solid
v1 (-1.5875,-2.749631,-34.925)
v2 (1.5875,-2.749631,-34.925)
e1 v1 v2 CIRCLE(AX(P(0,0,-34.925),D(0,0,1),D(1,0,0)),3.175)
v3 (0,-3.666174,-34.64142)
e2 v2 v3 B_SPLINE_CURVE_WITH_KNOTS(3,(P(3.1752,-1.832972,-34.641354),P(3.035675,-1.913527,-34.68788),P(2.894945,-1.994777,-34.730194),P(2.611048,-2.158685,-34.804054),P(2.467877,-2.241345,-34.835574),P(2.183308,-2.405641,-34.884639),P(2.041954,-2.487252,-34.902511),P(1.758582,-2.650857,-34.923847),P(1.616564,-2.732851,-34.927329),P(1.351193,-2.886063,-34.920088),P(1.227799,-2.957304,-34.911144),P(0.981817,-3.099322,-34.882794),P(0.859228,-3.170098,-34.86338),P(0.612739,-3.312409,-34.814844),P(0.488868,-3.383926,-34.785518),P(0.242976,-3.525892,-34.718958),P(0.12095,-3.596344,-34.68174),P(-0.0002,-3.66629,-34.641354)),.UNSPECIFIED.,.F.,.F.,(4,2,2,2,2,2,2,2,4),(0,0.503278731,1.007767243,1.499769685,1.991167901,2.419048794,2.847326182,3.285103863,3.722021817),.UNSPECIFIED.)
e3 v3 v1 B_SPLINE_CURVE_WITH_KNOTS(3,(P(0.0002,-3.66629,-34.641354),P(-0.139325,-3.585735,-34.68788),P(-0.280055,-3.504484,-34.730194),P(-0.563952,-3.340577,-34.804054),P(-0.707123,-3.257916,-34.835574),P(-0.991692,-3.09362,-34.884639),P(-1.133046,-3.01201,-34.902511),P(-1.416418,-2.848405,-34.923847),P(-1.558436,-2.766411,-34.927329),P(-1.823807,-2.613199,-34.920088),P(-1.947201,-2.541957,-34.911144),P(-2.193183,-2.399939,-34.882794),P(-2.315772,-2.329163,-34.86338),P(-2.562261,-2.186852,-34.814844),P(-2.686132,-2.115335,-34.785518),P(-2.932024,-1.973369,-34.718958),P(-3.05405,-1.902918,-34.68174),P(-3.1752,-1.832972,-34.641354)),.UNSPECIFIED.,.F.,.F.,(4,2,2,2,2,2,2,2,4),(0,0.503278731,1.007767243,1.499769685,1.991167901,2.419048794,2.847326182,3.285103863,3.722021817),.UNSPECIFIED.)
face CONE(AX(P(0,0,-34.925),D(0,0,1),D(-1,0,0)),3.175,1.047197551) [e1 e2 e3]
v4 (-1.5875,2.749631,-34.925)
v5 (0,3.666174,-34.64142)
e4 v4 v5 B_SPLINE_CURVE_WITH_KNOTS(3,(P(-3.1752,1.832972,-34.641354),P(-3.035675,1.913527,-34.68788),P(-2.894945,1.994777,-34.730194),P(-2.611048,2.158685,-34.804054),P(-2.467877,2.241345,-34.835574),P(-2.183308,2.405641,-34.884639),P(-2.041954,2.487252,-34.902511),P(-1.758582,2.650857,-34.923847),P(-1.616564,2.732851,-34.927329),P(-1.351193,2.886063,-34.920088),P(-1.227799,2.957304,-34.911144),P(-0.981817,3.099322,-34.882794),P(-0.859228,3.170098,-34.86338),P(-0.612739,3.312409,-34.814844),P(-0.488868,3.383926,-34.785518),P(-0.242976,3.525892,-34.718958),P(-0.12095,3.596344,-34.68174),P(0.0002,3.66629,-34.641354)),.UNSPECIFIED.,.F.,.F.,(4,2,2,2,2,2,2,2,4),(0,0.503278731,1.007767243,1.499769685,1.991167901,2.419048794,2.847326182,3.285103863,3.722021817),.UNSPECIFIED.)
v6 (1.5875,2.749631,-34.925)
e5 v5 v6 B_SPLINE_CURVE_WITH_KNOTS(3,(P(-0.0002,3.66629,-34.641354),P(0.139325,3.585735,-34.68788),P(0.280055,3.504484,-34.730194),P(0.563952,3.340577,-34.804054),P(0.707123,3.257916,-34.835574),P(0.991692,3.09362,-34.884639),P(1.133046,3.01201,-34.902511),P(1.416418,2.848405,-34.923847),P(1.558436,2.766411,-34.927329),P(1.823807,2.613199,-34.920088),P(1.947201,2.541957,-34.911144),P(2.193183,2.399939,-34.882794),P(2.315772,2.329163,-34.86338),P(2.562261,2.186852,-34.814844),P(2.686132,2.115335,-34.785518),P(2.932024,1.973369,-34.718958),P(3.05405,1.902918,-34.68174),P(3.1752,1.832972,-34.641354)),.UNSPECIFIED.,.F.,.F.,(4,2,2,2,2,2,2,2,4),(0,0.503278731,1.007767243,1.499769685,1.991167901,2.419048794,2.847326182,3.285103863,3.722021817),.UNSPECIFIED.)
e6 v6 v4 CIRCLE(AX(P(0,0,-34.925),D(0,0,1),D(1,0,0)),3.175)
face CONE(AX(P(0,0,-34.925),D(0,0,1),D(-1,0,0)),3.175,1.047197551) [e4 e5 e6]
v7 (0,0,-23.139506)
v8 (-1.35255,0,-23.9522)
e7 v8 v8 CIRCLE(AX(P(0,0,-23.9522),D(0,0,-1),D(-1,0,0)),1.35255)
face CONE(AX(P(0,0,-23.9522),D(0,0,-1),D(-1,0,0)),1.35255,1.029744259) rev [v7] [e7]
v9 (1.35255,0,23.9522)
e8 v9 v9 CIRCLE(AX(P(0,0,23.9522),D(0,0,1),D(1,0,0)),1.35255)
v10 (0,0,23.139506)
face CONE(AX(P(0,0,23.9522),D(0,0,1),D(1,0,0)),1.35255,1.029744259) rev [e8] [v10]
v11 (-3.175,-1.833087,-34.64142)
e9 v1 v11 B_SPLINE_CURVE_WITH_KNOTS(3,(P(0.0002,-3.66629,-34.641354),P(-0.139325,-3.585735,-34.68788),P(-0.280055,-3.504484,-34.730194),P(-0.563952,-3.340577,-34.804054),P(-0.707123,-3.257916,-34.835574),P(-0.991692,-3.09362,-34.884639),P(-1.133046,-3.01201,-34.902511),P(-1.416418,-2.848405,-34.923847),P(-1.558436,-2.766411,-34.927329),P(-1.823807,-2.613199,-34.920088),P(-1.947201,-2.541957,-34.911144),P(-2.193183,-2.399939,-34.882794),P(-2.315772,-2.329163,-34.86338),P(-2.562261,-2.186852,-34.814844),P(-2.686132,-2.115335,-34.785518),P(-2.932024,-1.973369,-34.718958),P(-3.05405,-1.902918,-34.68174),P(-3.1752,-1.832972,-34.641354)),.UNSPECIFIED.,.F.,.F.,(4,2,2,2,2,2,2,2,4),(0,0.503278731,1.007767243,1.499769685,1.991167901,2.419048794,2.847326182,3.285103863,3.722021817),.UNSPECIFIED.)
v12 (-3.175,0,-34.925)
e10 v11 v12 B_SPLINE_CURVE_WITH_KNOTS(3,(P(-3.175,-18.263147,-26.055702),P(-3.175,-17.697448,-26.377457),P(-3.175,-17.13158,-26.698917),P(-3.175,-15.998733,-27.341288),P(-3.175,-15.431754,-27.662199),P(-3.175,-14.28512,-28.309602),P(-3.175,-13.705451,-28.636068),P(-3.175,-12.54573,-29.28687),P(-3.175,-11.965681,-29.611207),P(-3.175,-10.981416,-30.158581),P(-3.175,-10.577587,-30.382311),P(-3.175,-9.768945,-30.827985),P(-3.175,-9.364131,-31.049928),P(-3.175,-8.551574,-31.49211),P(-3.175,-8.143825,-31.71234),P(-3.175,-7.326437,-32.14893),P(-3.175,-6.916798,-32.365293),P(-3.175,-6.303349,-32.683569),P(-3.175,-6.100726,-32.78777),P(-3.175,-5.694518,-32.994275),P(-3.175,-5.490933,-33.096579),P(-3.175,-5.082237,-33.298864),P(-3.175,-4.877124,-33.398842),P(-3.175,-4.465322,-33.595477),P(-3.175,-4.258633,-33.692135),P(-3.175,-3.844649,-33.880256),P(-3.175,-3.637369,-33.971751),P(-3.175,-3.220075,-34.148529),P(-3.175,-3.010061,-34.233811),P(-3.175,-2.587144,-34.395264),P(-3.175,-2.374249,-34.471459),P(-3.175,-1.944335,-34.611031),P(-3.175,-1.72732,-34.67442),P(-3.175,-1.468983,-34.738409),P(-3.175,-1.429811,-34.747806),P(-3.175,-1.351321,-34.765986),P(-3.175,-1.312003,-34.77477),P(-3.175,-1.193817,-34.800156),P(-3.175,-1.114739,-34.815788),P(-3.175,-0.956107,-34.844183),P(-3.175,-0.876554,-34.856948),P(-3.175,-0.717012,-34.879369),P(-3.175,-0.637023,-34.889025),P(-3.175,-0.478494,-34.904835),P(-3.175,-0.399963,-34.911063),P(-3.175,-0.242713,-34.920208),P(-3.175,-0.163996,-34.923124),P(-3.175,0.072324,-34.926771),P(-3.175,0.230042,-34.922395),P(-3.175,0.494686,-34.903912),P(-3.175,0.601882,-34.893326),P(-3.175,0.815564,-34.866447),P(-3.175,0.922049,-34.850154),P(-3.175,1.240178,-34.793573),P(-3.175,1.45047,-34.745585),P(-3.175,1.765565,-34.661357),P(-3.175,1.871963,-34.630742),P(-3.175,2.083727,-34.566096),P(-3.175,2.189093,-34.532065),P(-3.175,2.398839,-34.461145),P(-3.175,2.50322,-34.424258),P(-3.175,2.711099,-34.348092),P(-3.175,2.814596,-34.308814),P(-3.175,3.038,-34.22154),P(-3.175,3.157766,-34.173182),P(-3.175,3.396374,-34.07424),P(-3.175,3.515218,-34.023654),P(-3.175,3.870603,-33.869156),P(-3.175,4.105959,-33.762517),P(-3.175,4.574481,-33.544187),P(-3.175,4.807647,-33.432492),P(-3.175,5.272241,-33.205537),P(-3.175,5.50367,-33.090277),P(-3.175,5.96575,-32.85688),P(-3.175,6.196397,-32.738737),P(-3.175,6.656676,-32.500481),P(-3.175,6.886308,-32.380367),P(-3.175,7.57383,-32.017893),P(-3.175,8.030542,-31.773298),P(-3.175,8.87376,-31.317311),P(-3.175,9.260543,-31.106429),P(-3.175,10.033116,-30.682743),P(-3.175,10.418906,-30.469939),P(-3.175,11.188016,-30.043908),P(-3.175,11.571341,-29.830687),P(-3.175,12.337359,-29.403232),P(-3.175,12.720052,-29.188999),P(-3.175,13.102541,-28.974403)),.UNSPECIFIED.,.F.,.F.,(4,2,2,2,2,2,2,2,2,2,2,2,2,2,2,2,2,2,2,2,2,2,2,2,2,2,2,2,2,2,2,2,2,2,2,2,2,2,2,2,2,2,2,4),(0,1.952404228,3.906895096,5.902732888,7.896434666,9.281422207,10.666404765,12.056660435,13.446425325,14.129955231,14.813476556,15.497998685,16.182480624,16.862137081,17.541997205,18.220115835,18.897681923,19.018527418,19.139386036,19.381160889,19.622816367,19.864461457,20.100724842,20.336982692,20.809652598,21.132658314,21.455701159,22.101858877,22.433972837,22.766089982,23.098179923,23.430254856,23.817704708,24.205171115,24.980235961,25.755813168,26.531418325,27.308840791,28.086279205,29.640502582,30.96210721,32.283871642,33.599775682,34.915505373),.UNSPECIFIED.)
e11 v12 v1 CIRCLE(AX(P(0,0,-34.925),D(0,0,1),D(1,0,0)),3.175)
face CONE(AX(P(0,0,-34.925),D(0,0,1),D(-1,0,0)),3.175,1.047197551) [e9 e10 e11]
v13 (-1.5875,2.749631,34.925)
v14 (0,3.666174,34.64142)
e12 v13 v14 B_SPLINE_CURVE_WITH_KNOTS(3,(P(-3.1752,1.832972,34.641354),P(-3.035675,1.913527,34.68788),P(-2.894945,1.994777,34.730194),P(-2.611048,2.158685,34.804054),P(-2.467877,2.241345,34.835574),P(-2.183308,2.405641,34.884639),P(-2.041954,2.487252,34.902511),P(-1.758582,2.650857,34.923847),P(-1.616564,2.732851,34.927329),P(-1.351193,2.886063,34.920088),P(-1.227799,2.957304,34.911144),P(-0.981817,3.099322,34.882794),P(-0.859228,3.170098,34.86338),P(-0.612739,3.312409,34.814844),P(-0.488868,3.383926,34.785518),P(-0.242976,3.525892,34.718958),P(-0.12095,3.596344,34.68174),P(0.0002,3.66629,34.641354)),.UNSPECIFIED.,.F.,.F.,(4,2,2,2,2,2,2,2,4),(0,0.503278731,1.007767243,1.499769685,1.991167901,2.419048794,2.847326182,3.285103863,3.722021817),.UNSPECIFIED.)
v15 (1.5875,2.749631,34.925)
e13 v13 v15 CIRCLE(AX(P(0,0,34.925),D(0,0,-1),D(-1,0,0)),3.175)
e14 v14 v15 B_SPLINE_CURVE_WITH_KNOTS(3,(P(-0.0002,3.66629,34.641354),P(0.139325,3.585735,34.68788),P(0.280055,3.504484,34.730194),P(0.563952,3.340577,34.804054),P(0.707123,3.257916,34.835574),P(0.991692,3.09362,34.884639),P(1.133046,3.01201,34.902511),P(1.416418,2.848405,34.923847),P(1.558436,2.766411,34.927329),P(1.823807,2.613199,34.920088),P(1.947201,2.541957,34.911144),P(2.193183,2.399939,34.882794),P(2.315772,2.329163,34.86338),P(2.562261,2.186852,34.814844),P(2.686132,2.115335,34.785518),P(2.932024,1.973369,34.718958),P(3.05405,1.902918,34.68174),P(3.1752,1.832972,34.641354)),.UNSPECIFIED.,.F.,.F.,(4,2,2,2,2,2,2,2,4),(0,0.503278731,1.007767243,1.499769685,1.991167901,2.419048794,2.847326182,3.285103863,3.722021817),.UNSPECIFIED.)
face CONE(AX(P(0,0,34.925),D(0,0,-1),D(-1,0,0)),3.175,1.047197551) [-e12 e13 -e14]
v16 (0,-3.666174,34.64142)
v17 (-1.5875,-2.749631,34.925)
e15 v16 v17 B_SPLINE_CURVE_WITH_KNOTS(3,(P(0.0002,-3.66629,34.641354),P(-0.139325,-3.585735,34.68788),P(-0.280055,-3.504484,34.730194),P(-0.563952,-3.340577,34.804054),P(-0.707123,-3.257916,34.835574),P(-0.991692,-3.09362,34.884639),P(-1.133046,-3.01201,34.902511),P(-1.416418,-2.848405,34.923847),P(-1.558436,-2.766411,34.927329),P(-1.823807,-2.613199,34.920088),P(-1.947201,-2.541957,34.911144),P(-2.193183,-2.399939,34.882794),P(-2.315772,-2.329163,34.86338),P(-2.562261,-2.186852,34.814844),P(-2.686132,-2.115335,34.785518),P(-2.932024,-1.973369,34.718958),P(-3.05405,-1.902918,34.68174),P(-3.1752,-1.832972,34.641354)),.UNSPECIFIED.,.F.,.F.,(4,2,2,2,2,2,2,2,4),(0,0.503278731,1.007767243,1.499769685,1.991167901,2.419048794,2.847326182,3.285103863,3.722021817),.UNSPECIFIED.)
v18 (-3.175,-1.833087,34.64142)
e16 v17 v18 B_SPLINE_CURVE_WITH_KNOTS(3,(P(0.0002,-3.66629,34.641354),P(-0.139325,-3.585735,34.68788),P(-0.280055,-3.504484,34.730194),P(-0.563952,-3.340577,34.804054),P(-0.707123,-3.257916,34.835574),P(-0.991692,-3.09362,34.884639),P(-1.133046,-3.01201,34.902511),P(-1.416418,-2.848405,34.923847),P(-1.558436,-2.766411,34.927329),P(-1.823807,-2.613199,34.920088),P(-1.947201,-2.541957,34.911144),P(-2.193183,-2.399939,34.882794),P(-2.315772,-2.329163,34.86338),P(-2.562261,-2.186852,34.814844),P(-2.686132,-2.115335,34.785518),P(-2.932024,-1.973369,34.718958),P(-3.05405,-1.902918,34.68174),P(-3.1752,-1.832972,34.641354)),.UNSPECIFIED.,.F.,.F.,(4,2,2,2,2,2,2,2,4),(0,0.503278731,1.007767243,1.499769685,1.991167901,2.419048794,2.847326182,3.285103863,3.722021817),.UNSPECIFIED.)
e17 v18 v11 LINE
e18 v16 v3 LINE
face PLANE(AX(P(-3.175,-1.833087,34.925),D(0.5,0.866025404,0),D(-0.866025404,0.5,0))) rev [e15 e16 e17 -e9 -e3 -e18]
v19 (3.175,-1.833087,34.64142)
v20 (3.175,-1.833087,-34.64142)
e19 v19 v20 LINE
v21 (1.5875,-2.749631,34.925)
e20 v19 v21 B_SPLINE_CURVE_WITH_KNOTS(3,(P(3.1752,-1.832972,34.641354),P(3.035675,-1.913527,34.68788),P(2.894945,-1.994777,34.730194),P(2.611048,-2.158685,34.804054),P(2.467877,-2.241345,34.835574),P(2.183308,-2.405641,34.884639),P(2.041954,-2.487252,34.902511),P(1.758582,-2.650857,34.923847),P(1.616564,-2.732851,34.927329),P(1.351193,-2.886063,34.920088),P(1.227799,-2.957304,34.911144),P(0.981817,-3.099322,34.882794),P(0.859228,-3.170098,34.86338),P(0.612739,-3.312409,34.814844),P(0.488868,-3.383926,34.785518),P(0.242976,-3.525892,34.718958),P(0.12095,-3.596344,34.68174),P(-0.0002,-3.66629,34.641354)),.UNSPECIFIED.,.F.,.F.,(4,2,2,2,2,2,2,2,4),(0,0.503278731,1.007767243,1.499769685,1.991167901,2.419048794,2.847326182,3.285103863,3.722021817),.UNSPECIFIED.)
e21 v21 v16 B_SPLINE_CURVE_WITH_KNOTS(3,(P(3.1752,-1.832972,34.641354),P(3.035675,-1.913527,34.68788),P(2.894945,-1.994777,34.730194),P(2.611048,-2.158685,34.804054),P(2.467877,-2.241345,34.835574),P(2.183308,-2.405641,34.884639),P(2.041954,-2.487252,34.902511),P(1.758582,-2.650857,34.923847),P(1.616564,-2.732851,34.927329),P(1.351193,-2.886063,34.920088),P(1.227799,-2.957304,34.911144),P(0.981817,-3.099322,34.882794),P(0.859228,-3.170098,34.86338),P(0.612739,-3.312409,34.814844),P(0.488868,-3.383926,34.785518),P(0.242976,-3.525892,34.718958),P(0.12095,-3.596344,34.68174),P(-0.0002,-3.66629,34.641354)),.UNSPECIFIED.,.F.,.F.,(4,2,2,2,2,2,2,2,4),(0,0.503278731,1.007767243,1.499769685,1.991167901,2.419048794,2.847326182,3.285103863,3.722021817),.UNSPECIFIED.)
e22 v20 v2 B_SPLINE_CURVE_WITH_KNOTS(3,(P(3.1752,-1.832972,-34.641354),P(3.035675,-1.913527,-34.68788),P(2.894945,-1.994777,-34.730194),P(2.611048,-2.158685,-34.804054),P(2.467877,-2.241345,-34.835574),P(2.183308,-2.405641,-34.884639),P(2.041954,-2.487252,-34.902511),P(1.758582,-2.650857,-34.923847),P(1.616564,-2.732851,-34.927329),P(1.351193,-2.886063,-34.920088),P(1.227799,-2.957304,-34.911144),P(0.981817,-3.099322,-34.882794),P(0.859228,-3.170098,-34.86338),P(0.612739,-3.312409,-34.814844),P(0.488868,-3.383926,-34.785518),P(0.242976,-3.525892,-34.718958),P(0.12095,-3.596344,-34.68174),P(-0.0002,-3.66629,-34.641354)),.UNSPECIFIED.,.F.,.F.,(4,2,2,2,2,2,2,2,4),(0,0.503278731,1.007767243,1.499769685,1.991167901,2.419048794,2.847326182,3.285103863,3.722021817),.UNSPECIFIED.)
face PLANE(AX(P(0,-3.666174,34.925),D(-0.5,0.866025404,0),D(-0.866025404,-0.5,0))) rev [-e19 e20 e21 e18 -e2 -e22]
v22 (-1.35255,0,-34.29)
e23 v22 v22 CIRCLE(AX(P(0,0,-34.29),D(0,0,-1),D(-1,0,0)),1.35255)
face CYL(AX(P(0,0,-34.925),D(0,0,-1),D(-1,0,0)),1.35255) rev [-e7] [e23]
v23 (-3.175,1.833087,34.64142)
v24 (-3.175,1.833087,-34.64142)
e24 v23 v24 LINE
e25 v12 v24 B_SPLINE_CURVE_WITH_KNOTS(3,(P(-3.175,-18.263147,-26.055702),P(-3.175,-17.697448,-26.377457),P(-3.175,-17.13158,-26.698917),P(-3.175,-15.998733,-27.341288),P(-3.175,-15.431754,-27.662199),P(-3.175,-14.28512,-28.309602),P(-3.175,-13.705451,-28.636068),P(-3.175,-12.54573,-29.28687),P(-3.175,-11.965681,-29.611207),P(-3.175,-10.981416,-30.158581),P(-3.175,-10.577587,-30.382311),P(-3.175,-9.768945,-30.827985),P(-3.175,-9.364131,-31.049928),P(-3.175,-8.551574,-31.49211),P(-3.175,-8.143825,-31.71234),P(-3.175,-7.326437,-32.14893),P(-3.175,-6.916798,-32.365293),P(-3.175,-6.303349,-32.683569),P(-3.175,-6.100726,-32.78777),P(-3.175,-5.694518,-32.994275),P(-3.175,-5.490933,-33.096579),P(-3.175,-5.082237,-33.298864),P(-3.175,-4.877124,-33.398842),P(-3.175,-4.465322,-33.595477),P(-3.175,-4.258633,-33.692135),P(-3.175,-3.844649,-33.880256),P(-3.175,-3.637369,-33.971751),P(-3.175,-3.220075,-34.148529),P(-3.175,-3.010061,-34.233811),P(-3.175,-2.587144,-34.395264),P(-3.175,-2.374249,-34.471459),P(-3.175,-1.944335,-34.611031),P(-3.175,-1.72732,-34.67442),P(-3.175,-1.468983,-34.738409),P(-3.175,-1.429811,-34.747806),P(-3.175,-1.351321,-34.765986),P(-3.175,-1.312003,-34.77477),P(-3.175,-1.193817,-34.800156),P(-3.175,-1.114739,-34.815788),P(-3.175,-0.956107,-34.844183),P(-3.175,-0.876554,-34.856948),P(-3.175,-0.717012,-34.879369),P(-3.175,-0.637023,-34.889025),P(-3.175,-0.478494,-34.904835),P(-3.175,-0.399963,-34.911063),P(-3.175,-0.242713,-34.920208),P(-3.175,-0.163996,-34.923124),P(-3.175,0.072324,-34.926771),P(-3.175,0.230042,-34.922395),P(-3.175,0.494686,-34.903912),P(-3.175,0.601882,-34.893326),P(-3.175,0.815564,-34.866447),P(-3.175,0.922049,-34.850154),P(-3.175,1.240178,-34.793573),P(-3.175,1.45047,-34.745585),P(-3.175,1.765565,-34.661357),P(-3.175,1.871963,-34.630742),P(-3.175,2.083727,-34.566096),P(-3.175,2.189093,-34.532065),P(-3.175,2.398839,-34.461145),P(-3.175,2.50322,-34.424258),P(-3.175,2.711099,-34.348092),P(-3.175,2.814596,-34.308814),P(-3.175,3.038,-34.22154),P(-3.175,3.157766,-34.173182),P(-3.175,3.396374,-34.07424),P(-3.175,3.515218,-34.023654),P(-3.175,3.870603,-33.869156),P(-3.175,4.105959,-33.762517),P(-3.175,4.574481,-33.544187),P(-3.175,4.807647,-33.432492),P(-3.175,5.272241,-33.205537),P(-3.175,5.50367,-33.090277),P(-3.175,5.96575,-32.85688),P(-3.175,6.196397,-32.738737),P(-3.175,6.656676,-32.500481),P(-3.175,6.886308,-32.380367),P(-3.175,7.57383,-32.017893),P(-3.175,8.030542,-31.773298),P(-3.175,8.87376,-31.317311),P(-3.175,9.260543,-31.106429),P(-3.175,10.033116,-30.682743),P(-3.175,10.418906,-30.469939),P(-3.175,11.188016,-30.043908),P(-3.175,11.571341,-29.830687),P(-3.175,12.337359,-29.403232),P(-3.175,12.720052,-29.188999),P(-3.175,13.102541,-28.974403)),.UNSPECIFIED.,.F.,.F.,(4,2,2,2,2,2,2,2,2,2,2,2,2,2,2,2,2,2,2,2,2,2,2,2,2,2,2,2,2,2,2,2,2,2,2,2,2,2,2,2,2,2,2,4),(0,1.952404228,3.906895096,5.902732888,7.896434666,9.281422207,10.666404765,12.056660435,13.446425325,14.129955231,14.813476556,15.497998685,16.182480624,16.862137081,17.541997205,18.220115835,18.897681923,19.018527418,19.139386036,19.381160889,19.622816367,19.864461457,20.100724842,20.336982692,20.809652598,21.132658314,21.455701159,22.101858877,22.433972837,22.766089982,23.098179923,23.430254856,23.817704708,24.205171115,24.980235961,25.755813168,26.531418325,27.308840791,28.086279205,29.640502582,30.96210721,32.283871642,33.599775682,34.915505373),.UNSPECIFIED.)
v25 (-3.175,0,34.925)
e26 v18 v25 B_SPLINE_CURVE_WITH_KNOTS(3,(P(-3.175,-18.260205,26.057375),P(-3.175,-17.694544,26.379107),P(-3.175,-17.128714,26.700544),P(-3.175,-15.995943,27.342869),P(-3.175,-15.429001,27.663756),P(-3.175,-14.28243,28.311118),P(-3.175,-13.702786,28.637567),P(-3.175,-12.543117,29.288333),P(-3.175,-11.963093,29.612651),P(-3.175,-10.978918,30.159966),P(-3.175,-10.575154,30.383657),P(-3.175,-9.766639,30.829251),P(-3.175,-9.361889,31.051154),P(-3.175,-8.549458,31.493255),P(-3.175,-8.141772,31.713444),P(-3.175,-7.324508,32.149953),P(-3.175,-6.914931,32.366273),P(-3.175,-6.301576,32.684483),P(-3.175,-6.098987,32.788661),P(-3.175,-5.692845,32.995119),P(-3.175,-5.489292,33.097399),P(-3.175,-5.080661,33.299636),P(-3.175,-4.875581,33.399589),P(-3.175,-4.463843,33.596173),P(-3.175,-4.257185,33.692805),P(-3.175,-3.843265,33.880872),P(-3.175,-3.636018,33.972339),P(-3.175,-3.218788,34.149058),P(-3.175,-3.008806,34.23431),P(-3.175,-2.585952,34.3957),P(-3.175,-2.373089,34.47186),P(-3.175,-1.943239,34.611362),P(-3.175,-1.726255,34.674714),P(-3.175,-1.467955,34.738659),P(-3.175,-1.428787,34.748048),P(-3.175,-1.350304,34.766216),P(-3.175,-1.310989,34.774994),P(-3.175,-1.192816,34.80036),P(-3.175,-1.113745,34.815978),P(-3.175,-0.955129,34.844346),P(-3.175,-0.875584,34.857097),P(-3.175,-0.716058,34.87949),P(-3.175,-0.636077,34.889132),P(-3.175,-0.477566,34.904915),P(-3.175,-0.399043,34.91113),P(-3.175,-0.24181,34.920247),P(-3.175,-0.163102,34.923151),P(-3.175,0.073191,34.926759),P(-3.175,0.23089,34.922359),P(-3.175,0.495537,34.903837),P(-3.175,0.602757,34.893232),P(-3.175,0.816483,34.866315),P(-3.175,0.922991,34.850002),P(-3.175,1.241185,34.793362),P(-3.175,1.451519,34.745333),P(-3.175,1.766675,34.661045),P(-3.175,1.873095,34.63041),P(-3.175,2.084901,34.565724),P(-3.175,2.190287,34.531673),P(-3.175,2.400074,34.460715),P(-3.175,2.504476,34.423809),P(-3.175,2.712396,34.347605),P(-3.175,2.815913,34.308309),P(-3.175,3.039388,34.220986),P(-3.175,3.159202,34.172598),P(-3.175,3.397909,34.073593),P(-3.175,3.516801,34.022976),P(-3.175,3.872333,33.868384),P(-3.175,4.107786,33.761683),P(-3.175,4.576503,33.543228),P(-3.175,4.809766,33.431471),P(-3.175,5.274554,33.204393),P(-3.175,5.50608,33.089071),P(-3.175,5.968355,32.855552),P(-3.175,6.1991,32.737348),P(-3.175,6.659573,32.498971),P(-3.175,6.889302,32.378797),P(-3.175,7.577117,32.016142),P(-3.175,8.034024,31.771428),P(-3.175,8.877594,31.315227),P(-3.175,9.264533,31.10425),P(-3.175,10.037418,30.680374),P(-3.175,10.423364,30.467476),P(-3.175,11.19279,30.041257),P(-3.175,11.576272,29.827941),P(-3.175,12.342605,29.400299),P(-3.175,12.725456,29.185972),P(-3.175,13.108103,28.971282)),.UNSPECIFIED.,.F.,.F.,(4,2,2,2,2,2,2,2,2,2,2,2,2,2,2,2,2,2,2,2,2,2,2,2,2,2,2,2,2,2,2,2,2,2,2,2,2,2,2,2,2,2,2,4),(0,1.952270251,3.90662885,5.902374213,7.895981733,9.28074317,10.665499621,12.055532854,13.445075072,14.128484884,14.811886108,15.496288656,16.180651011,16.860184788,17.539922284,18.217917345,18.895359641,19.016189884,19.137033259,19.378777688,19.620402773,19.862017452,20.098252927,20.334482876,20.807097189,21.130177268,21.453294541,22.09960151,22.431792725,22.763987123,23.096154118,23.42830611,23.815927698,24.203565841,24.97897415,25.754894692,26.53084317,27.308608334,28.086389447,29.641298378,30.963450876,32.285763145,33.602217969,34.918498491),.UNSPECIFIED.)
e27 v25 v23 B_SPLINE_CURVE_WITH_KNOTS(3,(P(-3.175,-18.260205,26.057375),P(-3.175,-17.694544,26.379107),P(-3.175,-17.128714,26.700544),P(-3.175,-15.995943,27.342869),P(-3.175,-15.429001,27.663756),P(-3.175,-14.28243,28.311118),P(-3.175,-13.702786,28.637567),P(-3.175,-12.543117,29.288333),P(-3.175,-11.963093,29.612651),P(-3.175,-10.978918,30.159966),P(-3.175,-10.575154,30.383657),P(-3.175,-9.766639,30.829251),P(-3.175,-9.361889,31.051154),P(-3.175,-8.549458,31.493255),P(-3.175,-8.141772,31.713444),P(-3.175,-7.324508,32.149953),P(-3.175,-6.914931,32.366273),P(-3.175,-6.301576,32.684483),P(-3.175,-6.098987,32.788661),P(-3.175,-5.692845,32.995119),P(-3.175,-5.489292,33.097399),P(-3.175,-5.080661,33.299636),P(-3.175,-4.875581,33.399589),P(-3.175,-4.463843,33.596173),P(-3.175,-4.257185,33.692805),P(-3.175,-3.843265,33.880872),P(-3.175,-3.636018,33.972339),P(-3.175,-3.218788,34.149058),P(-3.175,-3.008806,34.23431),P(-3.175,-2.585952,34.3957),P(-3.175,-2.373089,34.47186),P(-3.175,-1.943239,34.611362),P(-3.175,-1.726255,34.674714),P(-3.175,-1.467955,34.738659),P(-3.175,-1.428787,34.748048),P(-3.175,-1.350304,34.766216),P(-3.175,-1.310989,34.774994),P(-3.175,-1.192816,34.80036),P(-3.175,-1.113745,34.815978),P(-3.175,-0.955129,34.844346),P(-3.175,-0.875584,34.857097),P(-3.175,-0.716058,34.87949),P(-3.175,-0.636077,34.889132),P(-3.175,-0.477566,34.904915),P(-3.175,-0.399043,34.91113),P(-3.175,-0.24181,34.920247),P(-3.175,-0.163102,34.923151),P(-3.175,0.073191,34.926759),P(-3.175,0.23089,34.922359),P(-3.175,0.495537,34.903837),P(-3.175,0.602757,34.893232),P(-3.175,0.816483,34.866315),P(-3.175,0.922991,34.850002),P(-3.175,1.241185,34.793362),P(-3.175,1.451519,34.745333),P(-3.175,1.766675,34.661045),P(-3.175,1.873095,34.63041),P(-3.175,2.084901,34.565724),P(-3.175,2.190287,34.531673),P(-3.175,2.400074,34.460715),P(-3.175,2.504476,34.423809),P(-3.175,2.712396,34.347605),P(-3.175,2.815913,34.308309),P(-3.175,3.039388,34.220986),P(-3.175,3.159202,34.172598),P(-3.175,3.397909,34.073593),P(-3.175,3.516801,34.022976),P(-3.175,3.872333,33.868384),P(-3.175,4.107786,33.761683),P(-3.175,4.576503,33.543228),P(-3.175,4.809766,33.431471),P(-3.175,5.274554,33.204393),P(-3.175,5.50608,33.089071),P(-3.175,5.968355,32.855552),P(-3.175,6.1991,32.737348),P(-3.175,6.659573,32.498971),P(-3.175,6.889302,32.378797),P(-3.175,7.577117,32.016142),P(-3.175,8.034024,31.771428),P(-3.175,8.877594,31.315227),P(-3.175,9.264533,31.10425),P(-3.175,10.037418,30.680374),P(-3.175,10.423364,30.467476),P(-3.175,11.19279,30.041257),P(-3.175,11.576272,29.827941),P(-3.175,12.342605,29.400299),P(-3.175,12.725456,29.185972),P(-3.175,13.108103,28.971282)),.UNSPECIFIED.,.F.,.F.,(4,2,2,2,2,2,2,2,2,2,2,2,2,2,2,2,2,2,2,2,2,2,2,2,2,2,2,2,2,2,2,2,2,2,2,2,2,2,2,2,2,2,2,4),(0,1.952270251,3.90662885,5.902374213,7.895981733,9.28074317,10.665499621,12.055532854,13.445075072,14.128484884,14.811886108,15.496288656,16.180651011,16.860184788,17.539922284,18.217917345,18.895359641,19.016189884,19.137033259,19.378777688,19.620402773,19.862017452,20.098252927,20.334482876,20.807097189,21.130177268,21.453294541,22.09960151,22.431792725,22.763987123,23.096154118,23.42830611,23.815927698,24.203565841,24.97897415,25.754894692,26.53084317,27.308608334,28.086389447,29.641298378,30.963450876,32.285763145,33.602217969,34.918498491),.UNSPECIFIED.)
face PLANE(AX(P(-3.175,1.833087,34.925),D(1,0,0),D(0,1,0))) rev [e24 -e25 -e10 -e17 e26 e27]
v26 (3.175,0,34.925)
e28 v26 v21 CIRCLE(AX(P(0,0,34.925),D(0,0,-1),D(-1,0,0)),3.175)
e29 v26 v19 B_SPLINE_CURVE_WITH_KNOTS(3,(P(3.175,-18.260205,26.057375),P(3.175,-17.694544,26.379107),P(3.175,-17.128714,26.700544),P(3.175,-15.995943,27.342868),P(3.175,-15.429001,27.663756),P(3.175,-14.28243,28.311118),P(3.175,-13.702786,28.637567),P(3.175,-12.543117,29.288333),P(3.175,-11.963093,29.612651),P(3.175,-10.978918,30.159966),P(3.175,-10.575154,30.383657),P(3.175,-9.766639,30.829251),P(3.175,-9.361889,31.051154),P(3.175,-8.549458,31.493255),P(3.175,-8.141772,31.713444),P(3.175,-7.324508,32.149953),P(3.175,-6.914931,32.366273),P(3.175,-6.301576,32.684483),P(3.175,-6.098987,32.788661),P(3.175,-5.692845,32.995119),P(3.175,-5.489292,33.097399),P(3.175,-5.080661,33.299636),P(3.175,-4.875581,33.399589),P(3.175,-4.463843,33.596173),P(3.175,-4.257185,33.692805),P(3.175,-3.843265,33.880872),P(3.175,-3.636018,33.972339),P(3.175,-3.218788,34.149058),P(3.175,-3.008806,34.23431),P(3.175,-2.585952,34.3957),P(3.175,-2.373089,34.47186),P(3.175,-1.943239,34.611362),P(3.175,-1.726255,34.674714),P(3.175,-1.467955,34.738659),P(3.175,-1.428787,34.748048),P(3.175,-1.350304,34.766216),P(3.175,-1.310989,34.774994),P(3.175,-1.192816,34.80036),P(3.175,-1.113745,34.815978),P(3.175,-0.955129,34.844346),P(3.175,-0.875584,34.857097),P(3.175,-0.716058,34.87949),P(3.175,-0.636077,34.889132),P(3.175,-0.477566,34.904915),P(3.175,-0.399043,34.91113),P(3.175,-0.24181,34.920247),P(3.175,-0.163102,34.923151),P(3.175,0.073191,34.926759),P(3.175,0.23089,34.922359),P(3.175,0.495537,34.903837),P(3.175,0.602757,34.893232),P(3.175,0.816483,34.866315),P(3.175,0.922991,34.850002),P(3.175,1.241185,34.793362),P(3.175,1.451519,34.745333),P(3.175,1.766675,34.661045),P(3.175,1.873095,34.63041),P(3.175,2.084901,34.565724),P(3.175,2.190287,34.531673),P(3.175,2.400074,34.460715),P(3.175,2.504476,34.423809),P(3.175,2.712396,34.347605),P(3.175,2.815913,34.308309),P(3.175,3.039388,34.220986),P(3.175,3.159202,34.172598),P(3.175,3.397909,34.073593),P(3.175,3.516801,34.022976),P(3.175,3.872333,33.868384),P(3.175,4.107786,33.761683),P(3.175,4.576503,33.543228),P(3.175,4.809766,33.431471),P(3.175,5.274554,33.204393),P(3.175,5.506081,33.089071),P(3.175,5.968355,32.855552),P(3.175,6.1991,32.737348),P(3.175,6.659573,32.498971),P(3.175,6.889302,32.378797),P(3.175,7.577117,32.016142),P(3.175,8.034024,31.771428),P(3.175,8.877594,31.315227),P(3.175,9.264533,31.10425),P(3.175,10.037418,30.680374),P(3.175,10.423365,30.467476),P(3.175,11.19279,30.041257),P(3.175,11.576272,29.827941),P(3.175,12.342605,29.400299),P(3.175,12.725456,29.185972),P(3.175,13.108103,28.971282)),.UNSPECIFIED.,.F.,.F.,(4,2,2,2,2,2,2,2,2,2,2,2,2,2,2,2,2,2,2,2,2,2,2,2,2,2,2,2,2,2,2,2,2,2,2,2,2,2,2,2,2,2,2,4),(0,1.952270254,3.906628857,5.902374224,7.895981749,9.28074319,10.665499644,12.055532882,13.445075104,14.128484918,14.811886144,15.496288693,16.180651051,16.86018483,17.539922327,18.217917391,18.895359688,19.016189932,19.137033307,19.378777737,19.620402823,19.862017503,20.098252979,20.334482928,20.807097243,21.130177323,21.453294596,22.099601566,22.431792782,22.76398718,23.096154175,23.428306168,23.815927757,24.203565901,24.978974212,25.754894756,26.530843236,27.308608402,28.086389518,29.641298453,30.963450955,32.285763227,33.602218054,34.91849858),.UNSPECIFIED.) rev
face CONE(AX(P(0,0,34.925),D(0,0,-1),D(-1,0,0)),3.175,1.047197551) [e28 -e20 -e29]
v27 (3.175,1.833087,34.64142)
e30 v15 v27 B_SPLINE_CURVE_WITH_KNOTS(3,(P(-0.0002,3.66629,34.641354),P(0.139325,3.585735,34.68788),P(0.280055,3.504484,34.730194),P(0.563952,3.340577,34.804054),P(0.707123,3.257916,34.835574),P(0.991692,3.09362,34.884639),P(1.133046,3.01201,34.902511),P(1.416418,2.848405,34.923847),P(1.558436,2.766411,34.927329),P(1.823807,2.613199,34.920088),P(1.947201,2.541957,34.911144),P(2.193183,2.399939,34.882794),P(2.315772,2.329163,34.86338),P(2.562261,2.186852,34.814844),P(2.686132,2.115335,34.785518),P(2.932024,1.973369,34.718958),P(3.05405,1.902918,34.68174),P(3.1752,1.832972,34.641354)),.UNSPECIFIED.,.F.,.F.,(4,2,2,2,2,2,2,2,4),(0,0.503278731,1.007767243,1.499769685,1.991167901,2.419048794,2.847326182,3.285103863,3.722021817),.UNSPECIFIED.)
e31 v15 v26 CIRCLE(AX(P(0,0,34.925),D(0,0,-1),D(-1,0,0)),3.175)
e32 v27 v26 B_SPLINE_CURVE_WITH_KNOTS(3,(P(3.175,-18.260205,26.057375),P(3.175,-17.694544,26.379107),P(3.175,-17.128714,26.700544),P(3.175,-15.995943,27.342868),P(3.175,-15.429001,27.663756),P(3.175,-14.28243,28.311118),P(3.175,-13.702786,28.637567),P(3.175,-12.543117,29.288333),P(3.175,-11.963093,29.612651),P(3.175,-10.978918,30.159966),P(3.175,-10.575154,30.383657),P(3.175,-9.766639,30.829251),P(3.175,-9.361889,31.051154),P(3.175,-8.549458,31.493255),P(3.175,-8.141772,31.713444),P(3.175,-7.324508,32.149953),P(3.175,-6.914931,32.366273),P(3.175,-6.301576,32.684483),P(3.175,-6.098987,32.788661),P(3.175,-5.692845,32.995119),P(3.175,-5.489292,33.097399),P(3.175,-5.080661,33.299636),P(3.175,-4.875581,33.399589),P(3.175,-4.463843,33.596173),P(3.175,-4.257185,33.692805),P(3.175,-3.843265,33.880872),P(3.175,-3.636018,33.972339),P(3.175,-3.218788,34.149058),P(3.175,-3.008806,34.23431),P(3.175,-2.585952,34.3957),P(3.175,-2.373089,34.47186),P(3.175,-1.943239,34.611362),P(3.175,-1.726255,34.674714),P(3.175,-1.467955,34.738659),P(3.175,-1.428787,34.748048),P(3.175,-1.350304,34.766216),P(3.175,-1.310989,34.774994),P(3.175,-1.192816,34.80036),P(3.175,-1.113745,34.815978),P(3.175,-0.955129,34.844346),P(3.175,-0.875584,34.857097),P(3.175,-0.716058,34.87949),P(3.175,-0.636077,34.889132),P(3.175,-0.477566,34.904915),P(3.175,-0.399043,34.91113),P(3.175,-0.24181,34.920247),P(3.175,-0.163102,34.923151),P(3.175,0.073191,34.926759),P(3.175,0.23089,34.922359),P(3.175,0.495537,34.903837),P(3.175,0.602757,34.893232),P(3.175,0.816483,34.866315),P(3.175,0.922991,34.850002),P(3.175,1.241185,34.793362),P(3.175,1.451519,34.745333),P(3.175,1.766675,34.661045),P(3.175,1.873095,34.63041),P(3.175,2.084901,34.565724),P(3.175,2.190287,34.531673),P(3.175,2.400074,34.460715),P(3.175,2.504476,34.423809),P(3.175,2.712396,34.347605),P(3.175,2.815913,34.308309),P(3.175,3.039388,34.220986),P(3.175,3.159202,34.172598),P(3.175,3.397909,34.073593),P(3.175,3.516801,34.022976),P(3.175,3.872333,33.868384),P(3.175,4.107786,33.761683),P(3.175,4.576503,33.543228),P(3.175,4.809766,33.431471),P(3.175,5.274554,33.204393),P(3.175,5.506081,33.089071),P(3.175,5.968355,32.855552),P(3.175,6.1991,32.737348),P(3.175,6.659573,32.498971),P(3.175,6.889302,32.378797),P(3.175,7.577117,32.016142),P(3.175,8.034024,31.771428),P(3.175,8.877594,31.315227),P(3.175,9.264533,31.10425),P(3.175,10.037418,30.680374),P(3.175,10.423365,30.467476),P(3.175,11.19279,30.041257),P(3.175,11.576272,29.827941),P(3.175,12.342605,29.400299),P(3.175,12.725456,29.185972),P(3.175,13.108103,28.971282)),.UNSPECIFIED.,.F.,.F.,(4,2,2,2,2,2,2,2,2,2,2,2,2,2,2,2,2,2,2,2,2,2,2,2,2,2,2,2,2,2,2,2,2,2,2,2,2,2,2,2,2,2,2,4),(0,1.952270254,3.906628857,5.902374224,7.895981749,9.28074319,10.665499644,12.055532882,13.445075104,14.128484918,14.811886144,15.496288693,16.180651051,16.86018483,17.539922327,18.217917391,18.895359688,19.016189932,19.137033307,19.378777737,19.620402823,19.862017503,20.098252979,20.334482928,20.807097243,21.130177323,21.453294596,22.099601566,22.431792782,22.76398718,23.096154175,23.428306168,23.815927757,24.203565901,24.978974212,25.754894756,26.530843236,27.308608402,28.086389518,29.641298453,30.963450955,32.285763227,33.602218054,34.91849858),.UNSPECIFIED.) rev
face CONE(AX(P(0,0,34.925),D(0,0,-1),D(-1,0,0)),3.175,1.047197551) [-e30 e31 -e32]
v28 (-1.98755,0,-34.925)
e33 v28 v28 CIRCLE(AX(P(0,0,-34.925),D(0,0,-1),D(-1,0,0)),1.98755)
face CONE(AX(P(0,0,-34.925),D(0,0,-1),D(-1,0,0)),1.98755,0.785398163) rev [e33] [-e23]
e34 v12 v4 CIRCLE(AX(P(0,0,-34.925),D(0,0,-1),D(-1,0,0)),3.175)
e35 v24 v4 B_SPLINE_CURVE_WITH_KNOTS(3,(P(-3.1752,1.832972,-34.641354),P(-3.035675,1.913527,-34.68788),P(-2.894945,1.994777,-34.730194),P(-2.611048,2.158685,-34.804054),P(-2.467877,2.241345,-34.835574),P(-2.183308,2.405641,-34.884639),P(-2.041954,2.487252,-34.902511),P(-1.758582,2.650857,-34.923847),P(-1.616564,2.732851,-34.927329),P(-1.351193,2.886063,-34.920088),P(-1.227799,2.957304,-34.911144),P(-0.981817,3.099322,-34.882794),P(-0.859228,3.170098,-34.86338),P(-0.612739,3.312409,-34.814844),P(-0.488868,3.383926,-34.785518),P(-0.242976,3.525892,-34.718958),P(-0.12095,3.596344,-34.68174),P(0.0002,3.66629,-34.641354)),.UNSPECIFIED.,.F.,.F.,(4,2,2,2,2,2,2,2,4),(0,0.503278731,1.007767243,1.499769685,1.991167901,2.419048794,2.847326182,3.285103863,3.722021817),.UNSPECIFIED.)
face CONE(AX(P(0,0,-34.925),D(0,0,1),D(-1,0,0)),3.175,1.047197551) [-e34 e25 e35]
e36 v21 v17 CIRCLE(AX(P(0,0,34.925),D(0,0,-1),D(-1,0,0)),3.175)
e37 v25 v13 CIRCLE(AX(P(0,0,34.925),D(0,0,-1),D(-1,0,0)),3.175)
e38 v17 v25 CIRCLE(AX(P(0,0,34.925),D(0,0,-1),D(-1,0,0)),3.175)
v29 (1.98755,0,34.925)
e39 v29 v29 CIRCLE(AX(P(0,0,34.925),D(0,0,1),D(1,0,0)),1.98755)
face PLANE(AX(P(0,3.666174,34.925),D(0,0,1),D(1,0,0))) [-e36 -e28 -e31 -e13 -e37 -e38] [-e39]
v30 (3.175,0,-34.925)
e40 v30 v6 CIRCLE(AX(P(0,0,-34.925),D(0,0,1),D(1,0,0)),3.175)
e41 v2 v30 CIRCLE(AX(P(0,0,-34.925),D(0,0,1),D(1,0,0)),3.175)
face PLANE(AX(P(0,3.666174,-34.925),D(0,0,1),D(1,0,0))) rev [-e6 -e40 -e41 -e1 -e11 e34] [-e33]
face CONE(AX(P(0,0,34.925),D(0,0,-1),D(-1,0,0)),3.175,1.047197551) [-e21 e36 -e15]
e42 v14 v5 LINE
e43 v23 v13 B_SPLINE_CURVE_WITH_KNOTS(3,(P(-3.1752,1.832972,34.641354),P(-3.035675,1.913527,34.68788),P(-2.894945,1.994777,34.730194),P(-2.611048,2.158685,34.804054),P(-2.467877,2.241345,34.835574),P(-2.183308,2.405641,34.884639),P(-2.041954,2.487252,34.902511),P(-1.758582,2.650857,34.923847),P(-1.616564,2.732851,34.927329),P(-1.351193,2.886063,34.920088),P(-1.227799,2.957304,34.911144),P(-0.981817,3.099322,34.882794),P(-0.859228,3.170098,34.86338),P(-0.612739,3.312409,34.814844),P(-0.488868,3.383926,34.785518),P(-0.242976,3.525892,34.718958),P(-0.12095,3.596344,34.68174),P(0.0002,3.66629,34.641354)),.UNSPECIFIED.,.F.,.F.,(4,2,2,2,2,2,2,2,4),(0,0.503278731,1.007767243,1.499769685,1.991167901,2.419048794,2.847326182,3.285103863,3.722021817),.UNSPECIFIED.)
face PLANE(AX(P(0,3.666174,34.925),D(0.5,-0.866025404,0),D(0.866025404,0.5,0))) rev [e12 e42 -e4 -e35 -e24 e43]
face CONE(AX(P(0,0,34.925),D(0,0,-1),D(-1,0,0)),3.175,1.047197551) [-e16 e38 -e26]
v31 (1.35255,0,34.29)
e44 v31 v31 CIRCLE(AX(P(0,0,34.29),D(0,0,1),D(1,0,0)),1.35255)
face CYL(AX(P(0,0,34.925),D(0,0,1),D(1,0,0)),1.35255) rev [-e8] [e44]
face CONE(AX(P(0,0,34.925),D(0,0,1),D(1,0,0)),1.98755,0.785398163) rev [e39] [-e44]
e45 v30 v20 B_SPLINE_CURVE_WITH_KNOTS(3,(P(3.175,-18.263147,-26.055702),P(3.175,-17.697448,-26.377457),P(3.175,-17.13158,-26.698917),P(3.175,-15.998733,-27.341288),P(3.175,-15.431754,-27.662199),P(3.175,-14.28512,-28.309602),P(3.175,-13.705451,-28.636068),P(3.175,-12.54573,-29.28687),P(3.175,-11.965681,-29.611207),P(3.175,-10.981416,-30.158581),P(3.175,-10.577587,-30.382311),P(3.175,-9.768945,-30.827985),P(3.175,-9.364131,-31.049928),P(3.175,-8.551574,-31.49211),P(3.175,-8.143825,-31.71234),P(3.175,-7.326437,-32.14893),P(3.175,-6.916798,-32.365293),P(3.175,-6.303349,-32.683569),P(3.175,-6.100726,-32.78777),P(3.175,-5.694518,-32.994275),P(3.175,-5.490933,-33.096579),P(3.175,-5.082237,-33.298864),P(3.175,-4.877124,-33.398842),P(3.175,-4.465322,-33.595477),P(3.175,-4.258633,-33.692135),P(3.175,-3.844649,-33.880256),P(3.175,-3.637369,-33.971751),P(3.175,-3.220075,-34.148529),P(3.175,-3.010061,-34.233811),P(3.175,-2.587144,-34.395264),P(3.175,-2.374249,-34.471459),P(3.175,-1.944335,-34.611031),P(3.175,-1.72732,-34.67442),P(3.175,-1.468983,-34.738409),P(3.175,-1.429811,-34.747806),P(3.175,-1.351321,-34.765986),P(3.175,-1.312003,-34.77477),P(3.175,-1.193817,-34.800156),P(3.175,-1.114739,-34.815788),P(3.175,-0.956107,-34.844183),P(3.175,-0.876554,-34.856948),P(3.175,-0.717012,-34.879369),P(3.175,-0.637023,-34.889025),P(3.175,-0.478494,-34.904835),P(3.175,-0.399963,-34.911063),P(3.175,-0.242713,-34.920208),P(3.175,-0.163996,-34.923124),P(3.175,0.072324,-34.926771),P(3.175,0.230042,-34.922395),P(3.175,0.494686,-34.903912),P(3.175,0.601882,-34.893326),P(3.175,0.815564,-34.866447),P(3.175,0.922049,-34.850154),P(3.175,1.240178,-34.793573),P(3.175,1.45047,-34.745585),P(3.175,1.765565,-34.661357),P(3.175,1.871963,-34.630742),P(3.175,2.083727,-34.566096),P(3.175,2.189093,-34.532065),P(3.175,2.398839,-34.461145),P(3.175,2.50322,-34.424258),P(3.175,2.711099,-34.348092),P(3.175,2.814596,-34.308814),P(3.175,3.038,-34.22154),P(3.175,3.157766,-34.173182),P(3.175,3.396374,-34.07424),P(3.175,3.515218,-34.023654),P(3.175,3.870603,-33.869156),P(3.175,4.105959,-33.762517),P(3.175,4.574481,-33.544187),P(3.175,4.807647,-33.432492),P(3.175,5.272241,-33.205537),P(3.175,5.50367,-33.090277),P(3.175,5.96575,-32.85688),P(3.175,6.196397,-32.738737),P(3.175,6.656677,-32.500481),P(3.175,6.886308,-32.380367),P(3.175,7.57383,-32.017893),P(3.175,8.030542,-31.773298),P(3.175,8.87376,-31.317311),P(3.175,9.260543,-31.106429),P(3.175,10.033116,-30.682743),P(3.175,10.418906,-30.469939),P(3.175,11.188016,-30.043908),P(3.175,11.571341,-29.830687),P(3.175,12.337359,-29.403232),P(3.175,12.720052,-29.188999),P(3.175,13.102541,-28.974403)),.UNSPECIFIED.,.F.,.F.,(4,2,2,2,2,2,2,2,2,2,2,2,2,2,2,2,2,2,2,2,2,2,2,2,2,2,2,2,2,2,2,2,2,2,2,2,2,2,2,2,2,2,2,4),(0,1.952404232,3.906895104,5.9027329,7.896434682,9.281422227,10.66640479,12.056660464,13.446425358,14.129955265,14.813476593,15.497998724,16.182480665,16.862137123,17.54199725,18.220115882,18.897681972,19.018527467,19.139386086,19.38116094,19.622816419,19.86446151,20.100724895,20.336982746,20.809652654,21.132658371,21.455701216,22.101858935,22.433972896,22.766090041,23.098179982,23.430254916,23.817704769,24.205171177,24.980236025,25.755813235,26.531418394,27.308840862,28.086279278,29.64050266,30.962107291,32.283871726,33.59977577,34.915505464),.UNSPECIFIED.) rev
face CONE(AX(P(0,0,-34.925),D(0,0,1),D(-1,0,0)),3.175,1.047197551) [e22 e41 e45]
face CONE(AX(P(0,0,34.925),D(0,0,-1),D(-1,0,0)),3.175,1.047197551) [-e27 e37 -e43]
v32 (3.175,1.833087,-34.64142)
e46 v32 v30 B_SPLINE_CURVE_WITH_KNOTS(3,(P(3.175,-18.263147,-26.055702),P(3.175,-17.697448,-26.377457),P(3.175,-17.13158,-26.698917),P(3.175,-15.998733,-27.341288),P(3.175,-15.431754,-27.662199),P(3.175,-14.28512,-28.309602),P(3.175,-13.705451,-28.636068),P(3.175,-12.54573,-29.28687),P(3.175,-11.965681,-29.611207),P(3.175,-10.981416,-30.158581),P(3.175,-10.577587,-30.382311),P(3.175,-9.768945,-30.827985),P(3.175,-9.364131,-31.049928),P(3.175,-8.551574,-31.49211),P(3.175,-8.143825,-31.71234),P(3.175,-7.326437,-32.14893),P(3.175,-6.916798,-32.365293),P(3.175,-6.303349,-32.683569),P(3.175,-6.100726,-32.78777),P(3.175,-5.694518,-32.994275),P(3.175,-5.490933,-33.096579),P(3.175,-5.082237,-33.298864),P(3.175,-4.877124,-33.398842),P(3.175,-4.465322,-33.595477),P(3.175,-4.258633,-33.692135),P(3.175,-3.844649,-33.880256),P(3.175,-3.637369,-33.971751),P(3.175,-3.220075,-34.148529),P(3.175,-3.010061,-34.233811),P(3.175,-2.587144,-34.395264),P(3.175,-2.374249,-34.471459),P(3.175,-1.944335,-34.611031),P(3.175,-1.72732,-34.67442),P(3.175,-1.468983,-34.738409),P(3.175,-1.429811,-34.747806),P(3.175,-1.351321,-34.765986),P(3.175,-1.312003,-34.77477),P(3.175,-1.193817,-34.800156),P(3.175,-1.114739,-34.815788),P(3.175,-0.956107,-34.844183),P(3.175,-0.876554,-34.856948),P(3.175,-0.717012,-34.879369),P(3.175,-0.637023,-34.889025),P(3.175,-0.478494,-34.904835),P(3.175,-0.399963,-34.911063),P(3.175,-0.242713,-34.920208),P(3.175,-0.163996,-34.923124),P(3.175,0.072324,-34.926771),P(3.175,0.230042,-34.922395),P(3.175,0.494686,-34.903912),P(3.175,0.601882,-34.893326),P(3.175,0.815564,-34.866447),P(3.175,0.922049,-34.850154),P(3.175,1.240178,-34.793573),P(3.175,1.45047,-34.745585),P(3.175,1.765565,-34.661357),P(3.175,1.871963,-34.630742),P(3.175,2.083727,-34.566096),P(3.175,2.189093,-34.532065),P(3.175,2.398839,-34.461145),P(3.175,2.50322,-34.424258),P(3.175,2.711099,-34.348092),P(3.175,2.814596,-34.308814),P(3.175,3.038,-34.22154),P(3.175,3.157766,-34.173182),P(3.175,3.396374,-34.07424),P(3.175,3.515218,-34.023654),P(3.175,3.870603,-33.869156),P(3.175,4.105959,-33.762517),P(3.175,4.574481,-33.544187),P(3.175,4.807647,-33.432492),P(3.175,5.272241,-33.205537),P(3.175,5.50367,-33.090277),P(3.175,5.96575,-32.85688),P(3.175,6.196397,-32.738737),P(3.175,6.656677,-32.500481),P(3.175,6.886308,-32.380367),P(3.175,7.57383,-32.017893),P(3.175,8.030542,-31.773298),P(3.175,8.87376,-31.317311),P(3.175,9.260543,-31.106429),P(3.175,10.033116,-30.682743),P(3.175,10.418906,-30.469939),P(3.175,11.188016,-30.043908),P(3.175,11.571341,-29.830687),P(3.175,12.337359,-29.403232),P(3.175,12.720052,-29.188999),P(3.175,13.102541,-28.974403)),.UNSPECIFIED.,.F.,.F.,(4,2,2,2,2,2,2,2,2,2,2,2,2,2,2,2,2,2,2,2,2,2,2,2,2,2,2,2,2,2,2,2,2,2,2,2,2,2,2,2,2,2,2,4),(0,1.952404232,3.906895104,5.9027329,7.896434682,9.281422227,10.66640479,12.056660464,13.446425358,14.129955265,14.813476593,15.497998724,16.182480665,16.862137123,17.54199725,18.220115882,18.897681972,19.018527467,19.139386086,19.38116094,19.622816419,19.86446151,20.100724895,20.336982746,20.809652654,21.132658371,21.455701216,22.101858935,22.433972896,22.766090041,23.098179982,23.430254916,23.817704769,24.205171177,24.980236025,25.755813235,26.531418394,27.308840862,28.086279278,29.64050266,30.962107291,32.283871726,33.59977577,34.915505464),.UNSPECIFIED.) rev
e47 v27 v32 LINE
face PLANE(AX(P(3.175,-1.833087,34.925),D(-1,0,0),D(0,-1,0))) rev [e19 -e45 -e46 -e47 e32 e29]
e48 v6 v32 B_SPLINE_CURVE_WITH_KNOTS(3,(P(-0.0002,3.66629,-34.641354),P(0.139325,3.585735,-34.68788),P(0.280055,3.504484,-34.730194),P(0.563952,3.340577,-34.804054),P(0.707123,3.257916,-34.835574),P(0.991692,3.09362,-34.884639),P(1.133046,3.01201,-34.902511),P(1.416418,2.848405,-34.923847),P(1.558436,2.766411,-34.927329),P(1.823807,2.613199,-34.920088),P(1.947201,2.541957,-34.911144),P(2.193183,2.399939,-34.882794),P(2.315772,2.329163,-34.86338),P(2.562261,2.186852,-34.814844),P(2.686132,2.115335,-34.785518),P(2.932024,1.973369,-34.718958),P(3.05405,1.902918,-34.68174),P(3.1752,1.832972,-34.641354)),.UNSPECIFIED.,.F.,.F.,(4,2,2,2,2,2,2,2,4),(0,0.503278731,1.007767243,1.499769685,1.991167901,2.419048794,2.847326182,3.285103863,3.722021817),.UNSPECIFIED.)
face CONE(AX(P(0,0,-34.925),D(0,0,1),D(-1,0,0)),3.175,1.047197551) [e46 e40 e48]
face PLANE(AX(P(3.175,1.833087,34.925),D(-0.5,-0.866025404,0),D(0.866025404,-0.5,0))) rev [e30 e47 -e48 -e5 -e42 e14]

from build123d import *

# Parameters (mm, degrees)
EXTRUDE1_DEPTH                  = 34.925
EXTRUDE1_DEPTH_BACK             = 34.925
SKETCH1_R                       = 1.7526
SWEEP1_PITCH                    = 0.79375
EXTRUDE2_DEPTH                  = 71.810206606
SKETCH8_OUTSIDE_W               = 271.37
SKETCH8_OUTSIDE_H               = 272.352
SKETCH8_OUTSIDE_R               = 3.175
EXTRUDE4_DEPTH                  = 71.810206606
EXTRUDE4_DRAFT                  = -60
MIRROR1_COPY_1_SKETCH_W         = 271.37
MIRROR1_COPY_1_SKETCH_H         = 272.352
MIRROR1_COPY_1_SKETCH_R         = 3.175
MIRROR1_COPY_1_DEPTH            = 71.810206606
MIRROR1_COPY_1_DRAFT            = -60
SKETCH9_W                       = 50.8
SKETCH9_H                       = 1.8034
SKETCH14_R                      = 2.341640739
BOSS_EXTRUDE1_DEPTH             = 69.85
F_6_32_TAPPED_HOLE1_D           = 2.7051
F_6_32_TAPPED_HOLE1_DEPTH       = 10.9728
F_6_32_TAPPED_HOLE1_CSINK_D     = 3.9751
F_6_32_TAPPED_HOLE1_CSINK_ANGLE = 90
F_6_32_TAPPED_HOLE1_TIP         = 0.81269403
F_6_32_TAPPED_HOLE2_D           = 2.7051
F_6_32_TAPPED_HOLE2_DEPTH       = 10.9728
F_6_32_TAPPED_HOLE2_CSINK_D     = 3.9751
F_6_32_TAPPED_HOLE2_CSINK_ANGLE = 90
F_6_32_TAPPED_HOLE2_TIP         = 0.81269403


with BuildPart() as part:
    # Sketch1 → Extrude1 (new, two sides: drawn at the far end of the back side and taken through both)
    with BuildSketch(Plane.XY.offset(-EXTRUDE1_DEPTH_BACK)):
        Polygon((0, 3.666174209), (-3.175, 1.833087105), (-3.175, -1.833087105), (0, -3.666174209), (3.175, -1.833087105), (3.175, 1.833087105), align=None)
        Circle(SKETCH1_R, mode=Mode.SUBTRACT)
    extrude(amount=EXTRUDE1_DEPTH + EXTRUDE1_DEPTH_BACK)

    # Sweep1: arcs per turn and ends read off the stored shape
    # Sweep1: the profile of Sketch12 profile screwed along a right-hand helix through 89 turns, 6 arcs to a turn; built about Z, then put on its axis
    sweep1_z = Axis((0, 0, 0), (0, 0, 1))
    sweep1_corners = [(1.7529, 0, -0.694704455), (1.7529, 0, 0.000173205), (1.237044252, 0, -0.29765625), (1.237044252, 0, -0.396875)]
    with BuildLine(mode=Mode.PRIVATE) as sweep1_profile:
        Line(sweep1_corners[0], sweep1_corners[1])
        Line(sweep1_corners[1], sweep1_corners[2])
        Line(sweep1_corners[2], sweep1_corners[3])
        Line(sweep1_corners[3], sweep1_corners[0])
    sweep1_cap = Face(sweep1_profile.wire())
    sweep1_turn_angles = [0, 30, 60, 90, 120, 150, 180, 210, 240, 270, 300, 330, 360]
    sweep1_turn_weights = [1, 0.8660254037844387, 1, 0.8660254037844387, 1, 0.8660254037844387, 1, 0.8660254037844387, 1, 0.8660254037844387, 1, 0.8660254037844387, 1]
    sweep1_turn_rails = [Edge.make_bspline([Vector(p[0], p[1], 0).rotate(sweep1_z, sweep1_turn_angles[k]) / sweep1_turn_weights[k] + Vector(0, 0, p[2] + SWEEP1_PITCH * sweep1_turn_angles[k] / 360) for k in range(13)], [0, 0, 0, 1, 1, 2, 2, 3, 3, 4, 4, 5, 5, 6, 6, 6], 2, sweep1_turn_weights) for p in sweep1_corners]
    sweep1_turn_sides = [Face.make_surface_from_curves(sweep1_turn_rails[p[0]], sweep1_turn_rails[p[1]]) for p in [(0, 1), (1, 2), (2, 3), (3, 0)]]
    sweep1_turn = Solid(Shell([*sweep1_turn_sides, sweep1_cap, sweep1_cap.rotate(sweep1_z, 360).moved(Location((0, 0, SWEEP1_PITCH * 360 / 360)))]))
    sweep1_each = [*[sweep1_turn.moved(Location((0, 0, SWEEP1_PITCH * i))) for i in range(89)]]
    add(Plane(origin=(0, 0, -34.925), x_dir=(0, 1, 0), z_dir=(0, 0, 1)) * Compound([sweep1_each[i] for i in range(0, 89, 2)]))
    add(Plane(origin=(0, 0, -34.925), x_dir=(0, 1, 0), z_dir=(0, 0, 1)) * Compound([sweep1_each[i] for i in range(1, 89, 2)]))

    # Sketch6 → Extrude2 (cut, through all)
    with BuildSketch(Plane(origin=(0, 0, -34.925), x_dir=(-1, 0, 0), z_dir=(0, 0, -1))):
        Polygon((0, 3.666174209), (-3.175, 1.833087105), (-3.175, -1.833087105), (0, -3.666174209), (3.175, -1.833087105), (3.175, 1.833087105), align=None)
    extrude2 = extrude(amount=EXTRUDE2_DEPTH, mode=Mode.SUBTRACT)

    # Extrude3 cone 1 section (through the dimple's axis) → Extrude3 (revolve, cut)
    with BuildSketch(Plane(origin=(0, 0, -34.925), x_dir=(0, 1, 0), z_dir=(1, 0, 0))):
        Polygon((0, 0), (1.8034, 0), (0, 1.933909732), align=None)
    extrude3 = revolve(axis=Axis((0, 0, -34.925), (0, 0, 1)), mode=Mode.SUBTRACT)


with BuildPart() as extrude4_tool:
    # Sketch8 outside → Extrude4 (with draft: the straight prism first)
    with BuildSketch(Plane(origin=(0, 0, -34.925), x_dir=(-1, 0, 0), z_dir=(0, 0, -1))):
        Rectangle(SKETCH8_OUTSIDE_W, SKETCH8_OUTSIDE_H)
        Circle(SKETCH8_OUTSIDE_R, mode=Mode.SUBTRACT)
    extrude(amount=-EXTRUDE4_DEPTH)
    # Extrude4: the draft: its side faces are tilted about the plane it starts from
    extrude4_sides = [extrude4_tool.faces().sort_by_distance(p)[0] for p in [
        (0, -136.176, 0.980103303),
        (-135.685, 0, 0.980103303),
        (0, 136.176, 0.980103303),
        (135.685, 0, 0.980103303),
        (3.175, 0, 0.980103303),
    ]]
    draft(extrude4_sides, Plane(origin=(0, 0, -34.925), x_dir=(-1, 0, 0), z_dir=(0, 0, -1)), EXTRUDE4_DRAFT)


with BuildPart() as part_1:
    add(part.part)

    # Extrude4: cut by extrude4_tool
    add(extrude4_tool.part, mode=Mode.SUBTRACT)

    # Mirror1: Extrude2, Extrude3 across plane
    add(extrude2.mirror(Plane.XY), mode=Mode.SUBTRACT)
    add(extrude3.mirror(Plane.XY), mode=Mode.SUBTRACT)


with BuildPart() as mirror1_copy_1_tool:
    # Mirror1 copy 1 sketch → Mirror1 copy 1 (with draft: the straight prism first)
    with BuildSketch(Plane(origin=(0, 0, 34.925), x_dir=(-1, 0, 0), z_dir=(0, 0, 1))):
        Rectangle(MIRROR1_COPY_1_SKETCH_W, MIRROR1_COPY_1_SKETCH_H)
        Circle(MIRROR1_COPY_1_SKETCH_R, mode=Mode.SUBTRACT)
    extrude(amount=-MIRROR1_COPY_1_DEPTH)
    # Mirror1 copy 1: the draft: its side faces are tilted about the plane it starts from
    mirror1_copy_1_sides = [mirror1_copy_1_tool.faces().sort_by_distance(p)[0] for p in [
        (0, -136.176, -0.980103303),
        (-135.685, 0, -0.980103303),
        (0, 136.176, -0.980103303),
        (135.685, 0, -0.980103303),
        (3.175, 0, -0.980103303),
    ]]
    draft(mirror1_copy_1_sides, Plane(origin=(0, 0, 34.925), x_dir=(-1, 0, 0), z_dir=(0, 0, 1)), MIRROR1_COPY_1_DRAFT)


with BuildPart() as part_2:
    add(part_1.part)

    # Mirror1 copy 1: cut by mirror1_copy_1_tool
    add(mirror1_copy_1_tool.part, mode=Mode.SUBTRACT)

    # Sketch9 → Revolve 2 (revolve)
    with BuildSketch(Plane(origin=(0, 0, 0), x_dir=(0, 0, -1), z_dir=(1, 0, 0)), mode=Mode.PRIVATE) as revolve_2_sk:
        with Locations((0, 0.9017)):
            Rectangle(SKETCH9_W, SKETCH9_H)
    revolve(revolve_2_sk.sketch.rotate(Axis((0, 0, 34.925), (0, 0, -1)), 270), axis=Axis((0, 0, 34.925), (0, 0, -1)))

    # Sketch14 → Boss-Extrude1 (add)
    with BuildSketch(Plane.XY.offset(34.925)):
        Circle(SKETCH14_R)
    extrude(amount=-BOSS_EXTRUDE1_DEPTH)

    # #6-32 Tapped Hole1
    with Locations(Plane(origin=(0, 0, -34.925), x_dir=(-1, 0, 0), z_dir=(0, 0, -1))):
        with Locations((0, 0)):
            CounterSinkHole(F_6_32_TAPPED_HOLE1_D / 2, F_6_32_TAPPED_HOLE1_CSINK_D / 2, depth=F_6_32_TAPPED_HOLE1_DEPTH, counter_sink_angle=F_6_32_TAPPED_HOLE1_CSINK_ANGLE)
            with Locations((0, 0, -(F_6_32_TAPPED_HOLE1_DEPTH + F_6_32_TAPPED_HOLE1_TIP / 2))):  # 118° drill point
                Cone(0, F_6_32_TAPPED_HOLE1_D / 2, F_6_32_TAPPED_HOLE1_TIP, mode=Mode.SUBTRACT)

    # #6-32 Tapped Hole2
    with Locations(Plane.XY.offset(34.925)):
        with Locations((0, 0)):
            CounterSinkHole(F_6_32_TAPPED_HOLE2_D / 2, F_6_32_TAPPED_HOLE2_CSINK_D / 2, depth=F_6_32_TAPPED_HOLE2_DEPTH, counter_sink_angle=F_6_32_TAPPED_HOLE2_CSINK_ANGLE)
            with Locations((0, 0, -(F_6_32_TAPPED_HOLE2_DEPTH + F_6_32_TAPPED_HOLE2_TIP / 2))):  # 118° drill point
                Cone(0, F_6_32_TAPPED_HOLE2_D / 2, F_6_32_TAPPED_HOLE2_TIP, mode=Mode.SUBTRACT)


solid = part_2.part
